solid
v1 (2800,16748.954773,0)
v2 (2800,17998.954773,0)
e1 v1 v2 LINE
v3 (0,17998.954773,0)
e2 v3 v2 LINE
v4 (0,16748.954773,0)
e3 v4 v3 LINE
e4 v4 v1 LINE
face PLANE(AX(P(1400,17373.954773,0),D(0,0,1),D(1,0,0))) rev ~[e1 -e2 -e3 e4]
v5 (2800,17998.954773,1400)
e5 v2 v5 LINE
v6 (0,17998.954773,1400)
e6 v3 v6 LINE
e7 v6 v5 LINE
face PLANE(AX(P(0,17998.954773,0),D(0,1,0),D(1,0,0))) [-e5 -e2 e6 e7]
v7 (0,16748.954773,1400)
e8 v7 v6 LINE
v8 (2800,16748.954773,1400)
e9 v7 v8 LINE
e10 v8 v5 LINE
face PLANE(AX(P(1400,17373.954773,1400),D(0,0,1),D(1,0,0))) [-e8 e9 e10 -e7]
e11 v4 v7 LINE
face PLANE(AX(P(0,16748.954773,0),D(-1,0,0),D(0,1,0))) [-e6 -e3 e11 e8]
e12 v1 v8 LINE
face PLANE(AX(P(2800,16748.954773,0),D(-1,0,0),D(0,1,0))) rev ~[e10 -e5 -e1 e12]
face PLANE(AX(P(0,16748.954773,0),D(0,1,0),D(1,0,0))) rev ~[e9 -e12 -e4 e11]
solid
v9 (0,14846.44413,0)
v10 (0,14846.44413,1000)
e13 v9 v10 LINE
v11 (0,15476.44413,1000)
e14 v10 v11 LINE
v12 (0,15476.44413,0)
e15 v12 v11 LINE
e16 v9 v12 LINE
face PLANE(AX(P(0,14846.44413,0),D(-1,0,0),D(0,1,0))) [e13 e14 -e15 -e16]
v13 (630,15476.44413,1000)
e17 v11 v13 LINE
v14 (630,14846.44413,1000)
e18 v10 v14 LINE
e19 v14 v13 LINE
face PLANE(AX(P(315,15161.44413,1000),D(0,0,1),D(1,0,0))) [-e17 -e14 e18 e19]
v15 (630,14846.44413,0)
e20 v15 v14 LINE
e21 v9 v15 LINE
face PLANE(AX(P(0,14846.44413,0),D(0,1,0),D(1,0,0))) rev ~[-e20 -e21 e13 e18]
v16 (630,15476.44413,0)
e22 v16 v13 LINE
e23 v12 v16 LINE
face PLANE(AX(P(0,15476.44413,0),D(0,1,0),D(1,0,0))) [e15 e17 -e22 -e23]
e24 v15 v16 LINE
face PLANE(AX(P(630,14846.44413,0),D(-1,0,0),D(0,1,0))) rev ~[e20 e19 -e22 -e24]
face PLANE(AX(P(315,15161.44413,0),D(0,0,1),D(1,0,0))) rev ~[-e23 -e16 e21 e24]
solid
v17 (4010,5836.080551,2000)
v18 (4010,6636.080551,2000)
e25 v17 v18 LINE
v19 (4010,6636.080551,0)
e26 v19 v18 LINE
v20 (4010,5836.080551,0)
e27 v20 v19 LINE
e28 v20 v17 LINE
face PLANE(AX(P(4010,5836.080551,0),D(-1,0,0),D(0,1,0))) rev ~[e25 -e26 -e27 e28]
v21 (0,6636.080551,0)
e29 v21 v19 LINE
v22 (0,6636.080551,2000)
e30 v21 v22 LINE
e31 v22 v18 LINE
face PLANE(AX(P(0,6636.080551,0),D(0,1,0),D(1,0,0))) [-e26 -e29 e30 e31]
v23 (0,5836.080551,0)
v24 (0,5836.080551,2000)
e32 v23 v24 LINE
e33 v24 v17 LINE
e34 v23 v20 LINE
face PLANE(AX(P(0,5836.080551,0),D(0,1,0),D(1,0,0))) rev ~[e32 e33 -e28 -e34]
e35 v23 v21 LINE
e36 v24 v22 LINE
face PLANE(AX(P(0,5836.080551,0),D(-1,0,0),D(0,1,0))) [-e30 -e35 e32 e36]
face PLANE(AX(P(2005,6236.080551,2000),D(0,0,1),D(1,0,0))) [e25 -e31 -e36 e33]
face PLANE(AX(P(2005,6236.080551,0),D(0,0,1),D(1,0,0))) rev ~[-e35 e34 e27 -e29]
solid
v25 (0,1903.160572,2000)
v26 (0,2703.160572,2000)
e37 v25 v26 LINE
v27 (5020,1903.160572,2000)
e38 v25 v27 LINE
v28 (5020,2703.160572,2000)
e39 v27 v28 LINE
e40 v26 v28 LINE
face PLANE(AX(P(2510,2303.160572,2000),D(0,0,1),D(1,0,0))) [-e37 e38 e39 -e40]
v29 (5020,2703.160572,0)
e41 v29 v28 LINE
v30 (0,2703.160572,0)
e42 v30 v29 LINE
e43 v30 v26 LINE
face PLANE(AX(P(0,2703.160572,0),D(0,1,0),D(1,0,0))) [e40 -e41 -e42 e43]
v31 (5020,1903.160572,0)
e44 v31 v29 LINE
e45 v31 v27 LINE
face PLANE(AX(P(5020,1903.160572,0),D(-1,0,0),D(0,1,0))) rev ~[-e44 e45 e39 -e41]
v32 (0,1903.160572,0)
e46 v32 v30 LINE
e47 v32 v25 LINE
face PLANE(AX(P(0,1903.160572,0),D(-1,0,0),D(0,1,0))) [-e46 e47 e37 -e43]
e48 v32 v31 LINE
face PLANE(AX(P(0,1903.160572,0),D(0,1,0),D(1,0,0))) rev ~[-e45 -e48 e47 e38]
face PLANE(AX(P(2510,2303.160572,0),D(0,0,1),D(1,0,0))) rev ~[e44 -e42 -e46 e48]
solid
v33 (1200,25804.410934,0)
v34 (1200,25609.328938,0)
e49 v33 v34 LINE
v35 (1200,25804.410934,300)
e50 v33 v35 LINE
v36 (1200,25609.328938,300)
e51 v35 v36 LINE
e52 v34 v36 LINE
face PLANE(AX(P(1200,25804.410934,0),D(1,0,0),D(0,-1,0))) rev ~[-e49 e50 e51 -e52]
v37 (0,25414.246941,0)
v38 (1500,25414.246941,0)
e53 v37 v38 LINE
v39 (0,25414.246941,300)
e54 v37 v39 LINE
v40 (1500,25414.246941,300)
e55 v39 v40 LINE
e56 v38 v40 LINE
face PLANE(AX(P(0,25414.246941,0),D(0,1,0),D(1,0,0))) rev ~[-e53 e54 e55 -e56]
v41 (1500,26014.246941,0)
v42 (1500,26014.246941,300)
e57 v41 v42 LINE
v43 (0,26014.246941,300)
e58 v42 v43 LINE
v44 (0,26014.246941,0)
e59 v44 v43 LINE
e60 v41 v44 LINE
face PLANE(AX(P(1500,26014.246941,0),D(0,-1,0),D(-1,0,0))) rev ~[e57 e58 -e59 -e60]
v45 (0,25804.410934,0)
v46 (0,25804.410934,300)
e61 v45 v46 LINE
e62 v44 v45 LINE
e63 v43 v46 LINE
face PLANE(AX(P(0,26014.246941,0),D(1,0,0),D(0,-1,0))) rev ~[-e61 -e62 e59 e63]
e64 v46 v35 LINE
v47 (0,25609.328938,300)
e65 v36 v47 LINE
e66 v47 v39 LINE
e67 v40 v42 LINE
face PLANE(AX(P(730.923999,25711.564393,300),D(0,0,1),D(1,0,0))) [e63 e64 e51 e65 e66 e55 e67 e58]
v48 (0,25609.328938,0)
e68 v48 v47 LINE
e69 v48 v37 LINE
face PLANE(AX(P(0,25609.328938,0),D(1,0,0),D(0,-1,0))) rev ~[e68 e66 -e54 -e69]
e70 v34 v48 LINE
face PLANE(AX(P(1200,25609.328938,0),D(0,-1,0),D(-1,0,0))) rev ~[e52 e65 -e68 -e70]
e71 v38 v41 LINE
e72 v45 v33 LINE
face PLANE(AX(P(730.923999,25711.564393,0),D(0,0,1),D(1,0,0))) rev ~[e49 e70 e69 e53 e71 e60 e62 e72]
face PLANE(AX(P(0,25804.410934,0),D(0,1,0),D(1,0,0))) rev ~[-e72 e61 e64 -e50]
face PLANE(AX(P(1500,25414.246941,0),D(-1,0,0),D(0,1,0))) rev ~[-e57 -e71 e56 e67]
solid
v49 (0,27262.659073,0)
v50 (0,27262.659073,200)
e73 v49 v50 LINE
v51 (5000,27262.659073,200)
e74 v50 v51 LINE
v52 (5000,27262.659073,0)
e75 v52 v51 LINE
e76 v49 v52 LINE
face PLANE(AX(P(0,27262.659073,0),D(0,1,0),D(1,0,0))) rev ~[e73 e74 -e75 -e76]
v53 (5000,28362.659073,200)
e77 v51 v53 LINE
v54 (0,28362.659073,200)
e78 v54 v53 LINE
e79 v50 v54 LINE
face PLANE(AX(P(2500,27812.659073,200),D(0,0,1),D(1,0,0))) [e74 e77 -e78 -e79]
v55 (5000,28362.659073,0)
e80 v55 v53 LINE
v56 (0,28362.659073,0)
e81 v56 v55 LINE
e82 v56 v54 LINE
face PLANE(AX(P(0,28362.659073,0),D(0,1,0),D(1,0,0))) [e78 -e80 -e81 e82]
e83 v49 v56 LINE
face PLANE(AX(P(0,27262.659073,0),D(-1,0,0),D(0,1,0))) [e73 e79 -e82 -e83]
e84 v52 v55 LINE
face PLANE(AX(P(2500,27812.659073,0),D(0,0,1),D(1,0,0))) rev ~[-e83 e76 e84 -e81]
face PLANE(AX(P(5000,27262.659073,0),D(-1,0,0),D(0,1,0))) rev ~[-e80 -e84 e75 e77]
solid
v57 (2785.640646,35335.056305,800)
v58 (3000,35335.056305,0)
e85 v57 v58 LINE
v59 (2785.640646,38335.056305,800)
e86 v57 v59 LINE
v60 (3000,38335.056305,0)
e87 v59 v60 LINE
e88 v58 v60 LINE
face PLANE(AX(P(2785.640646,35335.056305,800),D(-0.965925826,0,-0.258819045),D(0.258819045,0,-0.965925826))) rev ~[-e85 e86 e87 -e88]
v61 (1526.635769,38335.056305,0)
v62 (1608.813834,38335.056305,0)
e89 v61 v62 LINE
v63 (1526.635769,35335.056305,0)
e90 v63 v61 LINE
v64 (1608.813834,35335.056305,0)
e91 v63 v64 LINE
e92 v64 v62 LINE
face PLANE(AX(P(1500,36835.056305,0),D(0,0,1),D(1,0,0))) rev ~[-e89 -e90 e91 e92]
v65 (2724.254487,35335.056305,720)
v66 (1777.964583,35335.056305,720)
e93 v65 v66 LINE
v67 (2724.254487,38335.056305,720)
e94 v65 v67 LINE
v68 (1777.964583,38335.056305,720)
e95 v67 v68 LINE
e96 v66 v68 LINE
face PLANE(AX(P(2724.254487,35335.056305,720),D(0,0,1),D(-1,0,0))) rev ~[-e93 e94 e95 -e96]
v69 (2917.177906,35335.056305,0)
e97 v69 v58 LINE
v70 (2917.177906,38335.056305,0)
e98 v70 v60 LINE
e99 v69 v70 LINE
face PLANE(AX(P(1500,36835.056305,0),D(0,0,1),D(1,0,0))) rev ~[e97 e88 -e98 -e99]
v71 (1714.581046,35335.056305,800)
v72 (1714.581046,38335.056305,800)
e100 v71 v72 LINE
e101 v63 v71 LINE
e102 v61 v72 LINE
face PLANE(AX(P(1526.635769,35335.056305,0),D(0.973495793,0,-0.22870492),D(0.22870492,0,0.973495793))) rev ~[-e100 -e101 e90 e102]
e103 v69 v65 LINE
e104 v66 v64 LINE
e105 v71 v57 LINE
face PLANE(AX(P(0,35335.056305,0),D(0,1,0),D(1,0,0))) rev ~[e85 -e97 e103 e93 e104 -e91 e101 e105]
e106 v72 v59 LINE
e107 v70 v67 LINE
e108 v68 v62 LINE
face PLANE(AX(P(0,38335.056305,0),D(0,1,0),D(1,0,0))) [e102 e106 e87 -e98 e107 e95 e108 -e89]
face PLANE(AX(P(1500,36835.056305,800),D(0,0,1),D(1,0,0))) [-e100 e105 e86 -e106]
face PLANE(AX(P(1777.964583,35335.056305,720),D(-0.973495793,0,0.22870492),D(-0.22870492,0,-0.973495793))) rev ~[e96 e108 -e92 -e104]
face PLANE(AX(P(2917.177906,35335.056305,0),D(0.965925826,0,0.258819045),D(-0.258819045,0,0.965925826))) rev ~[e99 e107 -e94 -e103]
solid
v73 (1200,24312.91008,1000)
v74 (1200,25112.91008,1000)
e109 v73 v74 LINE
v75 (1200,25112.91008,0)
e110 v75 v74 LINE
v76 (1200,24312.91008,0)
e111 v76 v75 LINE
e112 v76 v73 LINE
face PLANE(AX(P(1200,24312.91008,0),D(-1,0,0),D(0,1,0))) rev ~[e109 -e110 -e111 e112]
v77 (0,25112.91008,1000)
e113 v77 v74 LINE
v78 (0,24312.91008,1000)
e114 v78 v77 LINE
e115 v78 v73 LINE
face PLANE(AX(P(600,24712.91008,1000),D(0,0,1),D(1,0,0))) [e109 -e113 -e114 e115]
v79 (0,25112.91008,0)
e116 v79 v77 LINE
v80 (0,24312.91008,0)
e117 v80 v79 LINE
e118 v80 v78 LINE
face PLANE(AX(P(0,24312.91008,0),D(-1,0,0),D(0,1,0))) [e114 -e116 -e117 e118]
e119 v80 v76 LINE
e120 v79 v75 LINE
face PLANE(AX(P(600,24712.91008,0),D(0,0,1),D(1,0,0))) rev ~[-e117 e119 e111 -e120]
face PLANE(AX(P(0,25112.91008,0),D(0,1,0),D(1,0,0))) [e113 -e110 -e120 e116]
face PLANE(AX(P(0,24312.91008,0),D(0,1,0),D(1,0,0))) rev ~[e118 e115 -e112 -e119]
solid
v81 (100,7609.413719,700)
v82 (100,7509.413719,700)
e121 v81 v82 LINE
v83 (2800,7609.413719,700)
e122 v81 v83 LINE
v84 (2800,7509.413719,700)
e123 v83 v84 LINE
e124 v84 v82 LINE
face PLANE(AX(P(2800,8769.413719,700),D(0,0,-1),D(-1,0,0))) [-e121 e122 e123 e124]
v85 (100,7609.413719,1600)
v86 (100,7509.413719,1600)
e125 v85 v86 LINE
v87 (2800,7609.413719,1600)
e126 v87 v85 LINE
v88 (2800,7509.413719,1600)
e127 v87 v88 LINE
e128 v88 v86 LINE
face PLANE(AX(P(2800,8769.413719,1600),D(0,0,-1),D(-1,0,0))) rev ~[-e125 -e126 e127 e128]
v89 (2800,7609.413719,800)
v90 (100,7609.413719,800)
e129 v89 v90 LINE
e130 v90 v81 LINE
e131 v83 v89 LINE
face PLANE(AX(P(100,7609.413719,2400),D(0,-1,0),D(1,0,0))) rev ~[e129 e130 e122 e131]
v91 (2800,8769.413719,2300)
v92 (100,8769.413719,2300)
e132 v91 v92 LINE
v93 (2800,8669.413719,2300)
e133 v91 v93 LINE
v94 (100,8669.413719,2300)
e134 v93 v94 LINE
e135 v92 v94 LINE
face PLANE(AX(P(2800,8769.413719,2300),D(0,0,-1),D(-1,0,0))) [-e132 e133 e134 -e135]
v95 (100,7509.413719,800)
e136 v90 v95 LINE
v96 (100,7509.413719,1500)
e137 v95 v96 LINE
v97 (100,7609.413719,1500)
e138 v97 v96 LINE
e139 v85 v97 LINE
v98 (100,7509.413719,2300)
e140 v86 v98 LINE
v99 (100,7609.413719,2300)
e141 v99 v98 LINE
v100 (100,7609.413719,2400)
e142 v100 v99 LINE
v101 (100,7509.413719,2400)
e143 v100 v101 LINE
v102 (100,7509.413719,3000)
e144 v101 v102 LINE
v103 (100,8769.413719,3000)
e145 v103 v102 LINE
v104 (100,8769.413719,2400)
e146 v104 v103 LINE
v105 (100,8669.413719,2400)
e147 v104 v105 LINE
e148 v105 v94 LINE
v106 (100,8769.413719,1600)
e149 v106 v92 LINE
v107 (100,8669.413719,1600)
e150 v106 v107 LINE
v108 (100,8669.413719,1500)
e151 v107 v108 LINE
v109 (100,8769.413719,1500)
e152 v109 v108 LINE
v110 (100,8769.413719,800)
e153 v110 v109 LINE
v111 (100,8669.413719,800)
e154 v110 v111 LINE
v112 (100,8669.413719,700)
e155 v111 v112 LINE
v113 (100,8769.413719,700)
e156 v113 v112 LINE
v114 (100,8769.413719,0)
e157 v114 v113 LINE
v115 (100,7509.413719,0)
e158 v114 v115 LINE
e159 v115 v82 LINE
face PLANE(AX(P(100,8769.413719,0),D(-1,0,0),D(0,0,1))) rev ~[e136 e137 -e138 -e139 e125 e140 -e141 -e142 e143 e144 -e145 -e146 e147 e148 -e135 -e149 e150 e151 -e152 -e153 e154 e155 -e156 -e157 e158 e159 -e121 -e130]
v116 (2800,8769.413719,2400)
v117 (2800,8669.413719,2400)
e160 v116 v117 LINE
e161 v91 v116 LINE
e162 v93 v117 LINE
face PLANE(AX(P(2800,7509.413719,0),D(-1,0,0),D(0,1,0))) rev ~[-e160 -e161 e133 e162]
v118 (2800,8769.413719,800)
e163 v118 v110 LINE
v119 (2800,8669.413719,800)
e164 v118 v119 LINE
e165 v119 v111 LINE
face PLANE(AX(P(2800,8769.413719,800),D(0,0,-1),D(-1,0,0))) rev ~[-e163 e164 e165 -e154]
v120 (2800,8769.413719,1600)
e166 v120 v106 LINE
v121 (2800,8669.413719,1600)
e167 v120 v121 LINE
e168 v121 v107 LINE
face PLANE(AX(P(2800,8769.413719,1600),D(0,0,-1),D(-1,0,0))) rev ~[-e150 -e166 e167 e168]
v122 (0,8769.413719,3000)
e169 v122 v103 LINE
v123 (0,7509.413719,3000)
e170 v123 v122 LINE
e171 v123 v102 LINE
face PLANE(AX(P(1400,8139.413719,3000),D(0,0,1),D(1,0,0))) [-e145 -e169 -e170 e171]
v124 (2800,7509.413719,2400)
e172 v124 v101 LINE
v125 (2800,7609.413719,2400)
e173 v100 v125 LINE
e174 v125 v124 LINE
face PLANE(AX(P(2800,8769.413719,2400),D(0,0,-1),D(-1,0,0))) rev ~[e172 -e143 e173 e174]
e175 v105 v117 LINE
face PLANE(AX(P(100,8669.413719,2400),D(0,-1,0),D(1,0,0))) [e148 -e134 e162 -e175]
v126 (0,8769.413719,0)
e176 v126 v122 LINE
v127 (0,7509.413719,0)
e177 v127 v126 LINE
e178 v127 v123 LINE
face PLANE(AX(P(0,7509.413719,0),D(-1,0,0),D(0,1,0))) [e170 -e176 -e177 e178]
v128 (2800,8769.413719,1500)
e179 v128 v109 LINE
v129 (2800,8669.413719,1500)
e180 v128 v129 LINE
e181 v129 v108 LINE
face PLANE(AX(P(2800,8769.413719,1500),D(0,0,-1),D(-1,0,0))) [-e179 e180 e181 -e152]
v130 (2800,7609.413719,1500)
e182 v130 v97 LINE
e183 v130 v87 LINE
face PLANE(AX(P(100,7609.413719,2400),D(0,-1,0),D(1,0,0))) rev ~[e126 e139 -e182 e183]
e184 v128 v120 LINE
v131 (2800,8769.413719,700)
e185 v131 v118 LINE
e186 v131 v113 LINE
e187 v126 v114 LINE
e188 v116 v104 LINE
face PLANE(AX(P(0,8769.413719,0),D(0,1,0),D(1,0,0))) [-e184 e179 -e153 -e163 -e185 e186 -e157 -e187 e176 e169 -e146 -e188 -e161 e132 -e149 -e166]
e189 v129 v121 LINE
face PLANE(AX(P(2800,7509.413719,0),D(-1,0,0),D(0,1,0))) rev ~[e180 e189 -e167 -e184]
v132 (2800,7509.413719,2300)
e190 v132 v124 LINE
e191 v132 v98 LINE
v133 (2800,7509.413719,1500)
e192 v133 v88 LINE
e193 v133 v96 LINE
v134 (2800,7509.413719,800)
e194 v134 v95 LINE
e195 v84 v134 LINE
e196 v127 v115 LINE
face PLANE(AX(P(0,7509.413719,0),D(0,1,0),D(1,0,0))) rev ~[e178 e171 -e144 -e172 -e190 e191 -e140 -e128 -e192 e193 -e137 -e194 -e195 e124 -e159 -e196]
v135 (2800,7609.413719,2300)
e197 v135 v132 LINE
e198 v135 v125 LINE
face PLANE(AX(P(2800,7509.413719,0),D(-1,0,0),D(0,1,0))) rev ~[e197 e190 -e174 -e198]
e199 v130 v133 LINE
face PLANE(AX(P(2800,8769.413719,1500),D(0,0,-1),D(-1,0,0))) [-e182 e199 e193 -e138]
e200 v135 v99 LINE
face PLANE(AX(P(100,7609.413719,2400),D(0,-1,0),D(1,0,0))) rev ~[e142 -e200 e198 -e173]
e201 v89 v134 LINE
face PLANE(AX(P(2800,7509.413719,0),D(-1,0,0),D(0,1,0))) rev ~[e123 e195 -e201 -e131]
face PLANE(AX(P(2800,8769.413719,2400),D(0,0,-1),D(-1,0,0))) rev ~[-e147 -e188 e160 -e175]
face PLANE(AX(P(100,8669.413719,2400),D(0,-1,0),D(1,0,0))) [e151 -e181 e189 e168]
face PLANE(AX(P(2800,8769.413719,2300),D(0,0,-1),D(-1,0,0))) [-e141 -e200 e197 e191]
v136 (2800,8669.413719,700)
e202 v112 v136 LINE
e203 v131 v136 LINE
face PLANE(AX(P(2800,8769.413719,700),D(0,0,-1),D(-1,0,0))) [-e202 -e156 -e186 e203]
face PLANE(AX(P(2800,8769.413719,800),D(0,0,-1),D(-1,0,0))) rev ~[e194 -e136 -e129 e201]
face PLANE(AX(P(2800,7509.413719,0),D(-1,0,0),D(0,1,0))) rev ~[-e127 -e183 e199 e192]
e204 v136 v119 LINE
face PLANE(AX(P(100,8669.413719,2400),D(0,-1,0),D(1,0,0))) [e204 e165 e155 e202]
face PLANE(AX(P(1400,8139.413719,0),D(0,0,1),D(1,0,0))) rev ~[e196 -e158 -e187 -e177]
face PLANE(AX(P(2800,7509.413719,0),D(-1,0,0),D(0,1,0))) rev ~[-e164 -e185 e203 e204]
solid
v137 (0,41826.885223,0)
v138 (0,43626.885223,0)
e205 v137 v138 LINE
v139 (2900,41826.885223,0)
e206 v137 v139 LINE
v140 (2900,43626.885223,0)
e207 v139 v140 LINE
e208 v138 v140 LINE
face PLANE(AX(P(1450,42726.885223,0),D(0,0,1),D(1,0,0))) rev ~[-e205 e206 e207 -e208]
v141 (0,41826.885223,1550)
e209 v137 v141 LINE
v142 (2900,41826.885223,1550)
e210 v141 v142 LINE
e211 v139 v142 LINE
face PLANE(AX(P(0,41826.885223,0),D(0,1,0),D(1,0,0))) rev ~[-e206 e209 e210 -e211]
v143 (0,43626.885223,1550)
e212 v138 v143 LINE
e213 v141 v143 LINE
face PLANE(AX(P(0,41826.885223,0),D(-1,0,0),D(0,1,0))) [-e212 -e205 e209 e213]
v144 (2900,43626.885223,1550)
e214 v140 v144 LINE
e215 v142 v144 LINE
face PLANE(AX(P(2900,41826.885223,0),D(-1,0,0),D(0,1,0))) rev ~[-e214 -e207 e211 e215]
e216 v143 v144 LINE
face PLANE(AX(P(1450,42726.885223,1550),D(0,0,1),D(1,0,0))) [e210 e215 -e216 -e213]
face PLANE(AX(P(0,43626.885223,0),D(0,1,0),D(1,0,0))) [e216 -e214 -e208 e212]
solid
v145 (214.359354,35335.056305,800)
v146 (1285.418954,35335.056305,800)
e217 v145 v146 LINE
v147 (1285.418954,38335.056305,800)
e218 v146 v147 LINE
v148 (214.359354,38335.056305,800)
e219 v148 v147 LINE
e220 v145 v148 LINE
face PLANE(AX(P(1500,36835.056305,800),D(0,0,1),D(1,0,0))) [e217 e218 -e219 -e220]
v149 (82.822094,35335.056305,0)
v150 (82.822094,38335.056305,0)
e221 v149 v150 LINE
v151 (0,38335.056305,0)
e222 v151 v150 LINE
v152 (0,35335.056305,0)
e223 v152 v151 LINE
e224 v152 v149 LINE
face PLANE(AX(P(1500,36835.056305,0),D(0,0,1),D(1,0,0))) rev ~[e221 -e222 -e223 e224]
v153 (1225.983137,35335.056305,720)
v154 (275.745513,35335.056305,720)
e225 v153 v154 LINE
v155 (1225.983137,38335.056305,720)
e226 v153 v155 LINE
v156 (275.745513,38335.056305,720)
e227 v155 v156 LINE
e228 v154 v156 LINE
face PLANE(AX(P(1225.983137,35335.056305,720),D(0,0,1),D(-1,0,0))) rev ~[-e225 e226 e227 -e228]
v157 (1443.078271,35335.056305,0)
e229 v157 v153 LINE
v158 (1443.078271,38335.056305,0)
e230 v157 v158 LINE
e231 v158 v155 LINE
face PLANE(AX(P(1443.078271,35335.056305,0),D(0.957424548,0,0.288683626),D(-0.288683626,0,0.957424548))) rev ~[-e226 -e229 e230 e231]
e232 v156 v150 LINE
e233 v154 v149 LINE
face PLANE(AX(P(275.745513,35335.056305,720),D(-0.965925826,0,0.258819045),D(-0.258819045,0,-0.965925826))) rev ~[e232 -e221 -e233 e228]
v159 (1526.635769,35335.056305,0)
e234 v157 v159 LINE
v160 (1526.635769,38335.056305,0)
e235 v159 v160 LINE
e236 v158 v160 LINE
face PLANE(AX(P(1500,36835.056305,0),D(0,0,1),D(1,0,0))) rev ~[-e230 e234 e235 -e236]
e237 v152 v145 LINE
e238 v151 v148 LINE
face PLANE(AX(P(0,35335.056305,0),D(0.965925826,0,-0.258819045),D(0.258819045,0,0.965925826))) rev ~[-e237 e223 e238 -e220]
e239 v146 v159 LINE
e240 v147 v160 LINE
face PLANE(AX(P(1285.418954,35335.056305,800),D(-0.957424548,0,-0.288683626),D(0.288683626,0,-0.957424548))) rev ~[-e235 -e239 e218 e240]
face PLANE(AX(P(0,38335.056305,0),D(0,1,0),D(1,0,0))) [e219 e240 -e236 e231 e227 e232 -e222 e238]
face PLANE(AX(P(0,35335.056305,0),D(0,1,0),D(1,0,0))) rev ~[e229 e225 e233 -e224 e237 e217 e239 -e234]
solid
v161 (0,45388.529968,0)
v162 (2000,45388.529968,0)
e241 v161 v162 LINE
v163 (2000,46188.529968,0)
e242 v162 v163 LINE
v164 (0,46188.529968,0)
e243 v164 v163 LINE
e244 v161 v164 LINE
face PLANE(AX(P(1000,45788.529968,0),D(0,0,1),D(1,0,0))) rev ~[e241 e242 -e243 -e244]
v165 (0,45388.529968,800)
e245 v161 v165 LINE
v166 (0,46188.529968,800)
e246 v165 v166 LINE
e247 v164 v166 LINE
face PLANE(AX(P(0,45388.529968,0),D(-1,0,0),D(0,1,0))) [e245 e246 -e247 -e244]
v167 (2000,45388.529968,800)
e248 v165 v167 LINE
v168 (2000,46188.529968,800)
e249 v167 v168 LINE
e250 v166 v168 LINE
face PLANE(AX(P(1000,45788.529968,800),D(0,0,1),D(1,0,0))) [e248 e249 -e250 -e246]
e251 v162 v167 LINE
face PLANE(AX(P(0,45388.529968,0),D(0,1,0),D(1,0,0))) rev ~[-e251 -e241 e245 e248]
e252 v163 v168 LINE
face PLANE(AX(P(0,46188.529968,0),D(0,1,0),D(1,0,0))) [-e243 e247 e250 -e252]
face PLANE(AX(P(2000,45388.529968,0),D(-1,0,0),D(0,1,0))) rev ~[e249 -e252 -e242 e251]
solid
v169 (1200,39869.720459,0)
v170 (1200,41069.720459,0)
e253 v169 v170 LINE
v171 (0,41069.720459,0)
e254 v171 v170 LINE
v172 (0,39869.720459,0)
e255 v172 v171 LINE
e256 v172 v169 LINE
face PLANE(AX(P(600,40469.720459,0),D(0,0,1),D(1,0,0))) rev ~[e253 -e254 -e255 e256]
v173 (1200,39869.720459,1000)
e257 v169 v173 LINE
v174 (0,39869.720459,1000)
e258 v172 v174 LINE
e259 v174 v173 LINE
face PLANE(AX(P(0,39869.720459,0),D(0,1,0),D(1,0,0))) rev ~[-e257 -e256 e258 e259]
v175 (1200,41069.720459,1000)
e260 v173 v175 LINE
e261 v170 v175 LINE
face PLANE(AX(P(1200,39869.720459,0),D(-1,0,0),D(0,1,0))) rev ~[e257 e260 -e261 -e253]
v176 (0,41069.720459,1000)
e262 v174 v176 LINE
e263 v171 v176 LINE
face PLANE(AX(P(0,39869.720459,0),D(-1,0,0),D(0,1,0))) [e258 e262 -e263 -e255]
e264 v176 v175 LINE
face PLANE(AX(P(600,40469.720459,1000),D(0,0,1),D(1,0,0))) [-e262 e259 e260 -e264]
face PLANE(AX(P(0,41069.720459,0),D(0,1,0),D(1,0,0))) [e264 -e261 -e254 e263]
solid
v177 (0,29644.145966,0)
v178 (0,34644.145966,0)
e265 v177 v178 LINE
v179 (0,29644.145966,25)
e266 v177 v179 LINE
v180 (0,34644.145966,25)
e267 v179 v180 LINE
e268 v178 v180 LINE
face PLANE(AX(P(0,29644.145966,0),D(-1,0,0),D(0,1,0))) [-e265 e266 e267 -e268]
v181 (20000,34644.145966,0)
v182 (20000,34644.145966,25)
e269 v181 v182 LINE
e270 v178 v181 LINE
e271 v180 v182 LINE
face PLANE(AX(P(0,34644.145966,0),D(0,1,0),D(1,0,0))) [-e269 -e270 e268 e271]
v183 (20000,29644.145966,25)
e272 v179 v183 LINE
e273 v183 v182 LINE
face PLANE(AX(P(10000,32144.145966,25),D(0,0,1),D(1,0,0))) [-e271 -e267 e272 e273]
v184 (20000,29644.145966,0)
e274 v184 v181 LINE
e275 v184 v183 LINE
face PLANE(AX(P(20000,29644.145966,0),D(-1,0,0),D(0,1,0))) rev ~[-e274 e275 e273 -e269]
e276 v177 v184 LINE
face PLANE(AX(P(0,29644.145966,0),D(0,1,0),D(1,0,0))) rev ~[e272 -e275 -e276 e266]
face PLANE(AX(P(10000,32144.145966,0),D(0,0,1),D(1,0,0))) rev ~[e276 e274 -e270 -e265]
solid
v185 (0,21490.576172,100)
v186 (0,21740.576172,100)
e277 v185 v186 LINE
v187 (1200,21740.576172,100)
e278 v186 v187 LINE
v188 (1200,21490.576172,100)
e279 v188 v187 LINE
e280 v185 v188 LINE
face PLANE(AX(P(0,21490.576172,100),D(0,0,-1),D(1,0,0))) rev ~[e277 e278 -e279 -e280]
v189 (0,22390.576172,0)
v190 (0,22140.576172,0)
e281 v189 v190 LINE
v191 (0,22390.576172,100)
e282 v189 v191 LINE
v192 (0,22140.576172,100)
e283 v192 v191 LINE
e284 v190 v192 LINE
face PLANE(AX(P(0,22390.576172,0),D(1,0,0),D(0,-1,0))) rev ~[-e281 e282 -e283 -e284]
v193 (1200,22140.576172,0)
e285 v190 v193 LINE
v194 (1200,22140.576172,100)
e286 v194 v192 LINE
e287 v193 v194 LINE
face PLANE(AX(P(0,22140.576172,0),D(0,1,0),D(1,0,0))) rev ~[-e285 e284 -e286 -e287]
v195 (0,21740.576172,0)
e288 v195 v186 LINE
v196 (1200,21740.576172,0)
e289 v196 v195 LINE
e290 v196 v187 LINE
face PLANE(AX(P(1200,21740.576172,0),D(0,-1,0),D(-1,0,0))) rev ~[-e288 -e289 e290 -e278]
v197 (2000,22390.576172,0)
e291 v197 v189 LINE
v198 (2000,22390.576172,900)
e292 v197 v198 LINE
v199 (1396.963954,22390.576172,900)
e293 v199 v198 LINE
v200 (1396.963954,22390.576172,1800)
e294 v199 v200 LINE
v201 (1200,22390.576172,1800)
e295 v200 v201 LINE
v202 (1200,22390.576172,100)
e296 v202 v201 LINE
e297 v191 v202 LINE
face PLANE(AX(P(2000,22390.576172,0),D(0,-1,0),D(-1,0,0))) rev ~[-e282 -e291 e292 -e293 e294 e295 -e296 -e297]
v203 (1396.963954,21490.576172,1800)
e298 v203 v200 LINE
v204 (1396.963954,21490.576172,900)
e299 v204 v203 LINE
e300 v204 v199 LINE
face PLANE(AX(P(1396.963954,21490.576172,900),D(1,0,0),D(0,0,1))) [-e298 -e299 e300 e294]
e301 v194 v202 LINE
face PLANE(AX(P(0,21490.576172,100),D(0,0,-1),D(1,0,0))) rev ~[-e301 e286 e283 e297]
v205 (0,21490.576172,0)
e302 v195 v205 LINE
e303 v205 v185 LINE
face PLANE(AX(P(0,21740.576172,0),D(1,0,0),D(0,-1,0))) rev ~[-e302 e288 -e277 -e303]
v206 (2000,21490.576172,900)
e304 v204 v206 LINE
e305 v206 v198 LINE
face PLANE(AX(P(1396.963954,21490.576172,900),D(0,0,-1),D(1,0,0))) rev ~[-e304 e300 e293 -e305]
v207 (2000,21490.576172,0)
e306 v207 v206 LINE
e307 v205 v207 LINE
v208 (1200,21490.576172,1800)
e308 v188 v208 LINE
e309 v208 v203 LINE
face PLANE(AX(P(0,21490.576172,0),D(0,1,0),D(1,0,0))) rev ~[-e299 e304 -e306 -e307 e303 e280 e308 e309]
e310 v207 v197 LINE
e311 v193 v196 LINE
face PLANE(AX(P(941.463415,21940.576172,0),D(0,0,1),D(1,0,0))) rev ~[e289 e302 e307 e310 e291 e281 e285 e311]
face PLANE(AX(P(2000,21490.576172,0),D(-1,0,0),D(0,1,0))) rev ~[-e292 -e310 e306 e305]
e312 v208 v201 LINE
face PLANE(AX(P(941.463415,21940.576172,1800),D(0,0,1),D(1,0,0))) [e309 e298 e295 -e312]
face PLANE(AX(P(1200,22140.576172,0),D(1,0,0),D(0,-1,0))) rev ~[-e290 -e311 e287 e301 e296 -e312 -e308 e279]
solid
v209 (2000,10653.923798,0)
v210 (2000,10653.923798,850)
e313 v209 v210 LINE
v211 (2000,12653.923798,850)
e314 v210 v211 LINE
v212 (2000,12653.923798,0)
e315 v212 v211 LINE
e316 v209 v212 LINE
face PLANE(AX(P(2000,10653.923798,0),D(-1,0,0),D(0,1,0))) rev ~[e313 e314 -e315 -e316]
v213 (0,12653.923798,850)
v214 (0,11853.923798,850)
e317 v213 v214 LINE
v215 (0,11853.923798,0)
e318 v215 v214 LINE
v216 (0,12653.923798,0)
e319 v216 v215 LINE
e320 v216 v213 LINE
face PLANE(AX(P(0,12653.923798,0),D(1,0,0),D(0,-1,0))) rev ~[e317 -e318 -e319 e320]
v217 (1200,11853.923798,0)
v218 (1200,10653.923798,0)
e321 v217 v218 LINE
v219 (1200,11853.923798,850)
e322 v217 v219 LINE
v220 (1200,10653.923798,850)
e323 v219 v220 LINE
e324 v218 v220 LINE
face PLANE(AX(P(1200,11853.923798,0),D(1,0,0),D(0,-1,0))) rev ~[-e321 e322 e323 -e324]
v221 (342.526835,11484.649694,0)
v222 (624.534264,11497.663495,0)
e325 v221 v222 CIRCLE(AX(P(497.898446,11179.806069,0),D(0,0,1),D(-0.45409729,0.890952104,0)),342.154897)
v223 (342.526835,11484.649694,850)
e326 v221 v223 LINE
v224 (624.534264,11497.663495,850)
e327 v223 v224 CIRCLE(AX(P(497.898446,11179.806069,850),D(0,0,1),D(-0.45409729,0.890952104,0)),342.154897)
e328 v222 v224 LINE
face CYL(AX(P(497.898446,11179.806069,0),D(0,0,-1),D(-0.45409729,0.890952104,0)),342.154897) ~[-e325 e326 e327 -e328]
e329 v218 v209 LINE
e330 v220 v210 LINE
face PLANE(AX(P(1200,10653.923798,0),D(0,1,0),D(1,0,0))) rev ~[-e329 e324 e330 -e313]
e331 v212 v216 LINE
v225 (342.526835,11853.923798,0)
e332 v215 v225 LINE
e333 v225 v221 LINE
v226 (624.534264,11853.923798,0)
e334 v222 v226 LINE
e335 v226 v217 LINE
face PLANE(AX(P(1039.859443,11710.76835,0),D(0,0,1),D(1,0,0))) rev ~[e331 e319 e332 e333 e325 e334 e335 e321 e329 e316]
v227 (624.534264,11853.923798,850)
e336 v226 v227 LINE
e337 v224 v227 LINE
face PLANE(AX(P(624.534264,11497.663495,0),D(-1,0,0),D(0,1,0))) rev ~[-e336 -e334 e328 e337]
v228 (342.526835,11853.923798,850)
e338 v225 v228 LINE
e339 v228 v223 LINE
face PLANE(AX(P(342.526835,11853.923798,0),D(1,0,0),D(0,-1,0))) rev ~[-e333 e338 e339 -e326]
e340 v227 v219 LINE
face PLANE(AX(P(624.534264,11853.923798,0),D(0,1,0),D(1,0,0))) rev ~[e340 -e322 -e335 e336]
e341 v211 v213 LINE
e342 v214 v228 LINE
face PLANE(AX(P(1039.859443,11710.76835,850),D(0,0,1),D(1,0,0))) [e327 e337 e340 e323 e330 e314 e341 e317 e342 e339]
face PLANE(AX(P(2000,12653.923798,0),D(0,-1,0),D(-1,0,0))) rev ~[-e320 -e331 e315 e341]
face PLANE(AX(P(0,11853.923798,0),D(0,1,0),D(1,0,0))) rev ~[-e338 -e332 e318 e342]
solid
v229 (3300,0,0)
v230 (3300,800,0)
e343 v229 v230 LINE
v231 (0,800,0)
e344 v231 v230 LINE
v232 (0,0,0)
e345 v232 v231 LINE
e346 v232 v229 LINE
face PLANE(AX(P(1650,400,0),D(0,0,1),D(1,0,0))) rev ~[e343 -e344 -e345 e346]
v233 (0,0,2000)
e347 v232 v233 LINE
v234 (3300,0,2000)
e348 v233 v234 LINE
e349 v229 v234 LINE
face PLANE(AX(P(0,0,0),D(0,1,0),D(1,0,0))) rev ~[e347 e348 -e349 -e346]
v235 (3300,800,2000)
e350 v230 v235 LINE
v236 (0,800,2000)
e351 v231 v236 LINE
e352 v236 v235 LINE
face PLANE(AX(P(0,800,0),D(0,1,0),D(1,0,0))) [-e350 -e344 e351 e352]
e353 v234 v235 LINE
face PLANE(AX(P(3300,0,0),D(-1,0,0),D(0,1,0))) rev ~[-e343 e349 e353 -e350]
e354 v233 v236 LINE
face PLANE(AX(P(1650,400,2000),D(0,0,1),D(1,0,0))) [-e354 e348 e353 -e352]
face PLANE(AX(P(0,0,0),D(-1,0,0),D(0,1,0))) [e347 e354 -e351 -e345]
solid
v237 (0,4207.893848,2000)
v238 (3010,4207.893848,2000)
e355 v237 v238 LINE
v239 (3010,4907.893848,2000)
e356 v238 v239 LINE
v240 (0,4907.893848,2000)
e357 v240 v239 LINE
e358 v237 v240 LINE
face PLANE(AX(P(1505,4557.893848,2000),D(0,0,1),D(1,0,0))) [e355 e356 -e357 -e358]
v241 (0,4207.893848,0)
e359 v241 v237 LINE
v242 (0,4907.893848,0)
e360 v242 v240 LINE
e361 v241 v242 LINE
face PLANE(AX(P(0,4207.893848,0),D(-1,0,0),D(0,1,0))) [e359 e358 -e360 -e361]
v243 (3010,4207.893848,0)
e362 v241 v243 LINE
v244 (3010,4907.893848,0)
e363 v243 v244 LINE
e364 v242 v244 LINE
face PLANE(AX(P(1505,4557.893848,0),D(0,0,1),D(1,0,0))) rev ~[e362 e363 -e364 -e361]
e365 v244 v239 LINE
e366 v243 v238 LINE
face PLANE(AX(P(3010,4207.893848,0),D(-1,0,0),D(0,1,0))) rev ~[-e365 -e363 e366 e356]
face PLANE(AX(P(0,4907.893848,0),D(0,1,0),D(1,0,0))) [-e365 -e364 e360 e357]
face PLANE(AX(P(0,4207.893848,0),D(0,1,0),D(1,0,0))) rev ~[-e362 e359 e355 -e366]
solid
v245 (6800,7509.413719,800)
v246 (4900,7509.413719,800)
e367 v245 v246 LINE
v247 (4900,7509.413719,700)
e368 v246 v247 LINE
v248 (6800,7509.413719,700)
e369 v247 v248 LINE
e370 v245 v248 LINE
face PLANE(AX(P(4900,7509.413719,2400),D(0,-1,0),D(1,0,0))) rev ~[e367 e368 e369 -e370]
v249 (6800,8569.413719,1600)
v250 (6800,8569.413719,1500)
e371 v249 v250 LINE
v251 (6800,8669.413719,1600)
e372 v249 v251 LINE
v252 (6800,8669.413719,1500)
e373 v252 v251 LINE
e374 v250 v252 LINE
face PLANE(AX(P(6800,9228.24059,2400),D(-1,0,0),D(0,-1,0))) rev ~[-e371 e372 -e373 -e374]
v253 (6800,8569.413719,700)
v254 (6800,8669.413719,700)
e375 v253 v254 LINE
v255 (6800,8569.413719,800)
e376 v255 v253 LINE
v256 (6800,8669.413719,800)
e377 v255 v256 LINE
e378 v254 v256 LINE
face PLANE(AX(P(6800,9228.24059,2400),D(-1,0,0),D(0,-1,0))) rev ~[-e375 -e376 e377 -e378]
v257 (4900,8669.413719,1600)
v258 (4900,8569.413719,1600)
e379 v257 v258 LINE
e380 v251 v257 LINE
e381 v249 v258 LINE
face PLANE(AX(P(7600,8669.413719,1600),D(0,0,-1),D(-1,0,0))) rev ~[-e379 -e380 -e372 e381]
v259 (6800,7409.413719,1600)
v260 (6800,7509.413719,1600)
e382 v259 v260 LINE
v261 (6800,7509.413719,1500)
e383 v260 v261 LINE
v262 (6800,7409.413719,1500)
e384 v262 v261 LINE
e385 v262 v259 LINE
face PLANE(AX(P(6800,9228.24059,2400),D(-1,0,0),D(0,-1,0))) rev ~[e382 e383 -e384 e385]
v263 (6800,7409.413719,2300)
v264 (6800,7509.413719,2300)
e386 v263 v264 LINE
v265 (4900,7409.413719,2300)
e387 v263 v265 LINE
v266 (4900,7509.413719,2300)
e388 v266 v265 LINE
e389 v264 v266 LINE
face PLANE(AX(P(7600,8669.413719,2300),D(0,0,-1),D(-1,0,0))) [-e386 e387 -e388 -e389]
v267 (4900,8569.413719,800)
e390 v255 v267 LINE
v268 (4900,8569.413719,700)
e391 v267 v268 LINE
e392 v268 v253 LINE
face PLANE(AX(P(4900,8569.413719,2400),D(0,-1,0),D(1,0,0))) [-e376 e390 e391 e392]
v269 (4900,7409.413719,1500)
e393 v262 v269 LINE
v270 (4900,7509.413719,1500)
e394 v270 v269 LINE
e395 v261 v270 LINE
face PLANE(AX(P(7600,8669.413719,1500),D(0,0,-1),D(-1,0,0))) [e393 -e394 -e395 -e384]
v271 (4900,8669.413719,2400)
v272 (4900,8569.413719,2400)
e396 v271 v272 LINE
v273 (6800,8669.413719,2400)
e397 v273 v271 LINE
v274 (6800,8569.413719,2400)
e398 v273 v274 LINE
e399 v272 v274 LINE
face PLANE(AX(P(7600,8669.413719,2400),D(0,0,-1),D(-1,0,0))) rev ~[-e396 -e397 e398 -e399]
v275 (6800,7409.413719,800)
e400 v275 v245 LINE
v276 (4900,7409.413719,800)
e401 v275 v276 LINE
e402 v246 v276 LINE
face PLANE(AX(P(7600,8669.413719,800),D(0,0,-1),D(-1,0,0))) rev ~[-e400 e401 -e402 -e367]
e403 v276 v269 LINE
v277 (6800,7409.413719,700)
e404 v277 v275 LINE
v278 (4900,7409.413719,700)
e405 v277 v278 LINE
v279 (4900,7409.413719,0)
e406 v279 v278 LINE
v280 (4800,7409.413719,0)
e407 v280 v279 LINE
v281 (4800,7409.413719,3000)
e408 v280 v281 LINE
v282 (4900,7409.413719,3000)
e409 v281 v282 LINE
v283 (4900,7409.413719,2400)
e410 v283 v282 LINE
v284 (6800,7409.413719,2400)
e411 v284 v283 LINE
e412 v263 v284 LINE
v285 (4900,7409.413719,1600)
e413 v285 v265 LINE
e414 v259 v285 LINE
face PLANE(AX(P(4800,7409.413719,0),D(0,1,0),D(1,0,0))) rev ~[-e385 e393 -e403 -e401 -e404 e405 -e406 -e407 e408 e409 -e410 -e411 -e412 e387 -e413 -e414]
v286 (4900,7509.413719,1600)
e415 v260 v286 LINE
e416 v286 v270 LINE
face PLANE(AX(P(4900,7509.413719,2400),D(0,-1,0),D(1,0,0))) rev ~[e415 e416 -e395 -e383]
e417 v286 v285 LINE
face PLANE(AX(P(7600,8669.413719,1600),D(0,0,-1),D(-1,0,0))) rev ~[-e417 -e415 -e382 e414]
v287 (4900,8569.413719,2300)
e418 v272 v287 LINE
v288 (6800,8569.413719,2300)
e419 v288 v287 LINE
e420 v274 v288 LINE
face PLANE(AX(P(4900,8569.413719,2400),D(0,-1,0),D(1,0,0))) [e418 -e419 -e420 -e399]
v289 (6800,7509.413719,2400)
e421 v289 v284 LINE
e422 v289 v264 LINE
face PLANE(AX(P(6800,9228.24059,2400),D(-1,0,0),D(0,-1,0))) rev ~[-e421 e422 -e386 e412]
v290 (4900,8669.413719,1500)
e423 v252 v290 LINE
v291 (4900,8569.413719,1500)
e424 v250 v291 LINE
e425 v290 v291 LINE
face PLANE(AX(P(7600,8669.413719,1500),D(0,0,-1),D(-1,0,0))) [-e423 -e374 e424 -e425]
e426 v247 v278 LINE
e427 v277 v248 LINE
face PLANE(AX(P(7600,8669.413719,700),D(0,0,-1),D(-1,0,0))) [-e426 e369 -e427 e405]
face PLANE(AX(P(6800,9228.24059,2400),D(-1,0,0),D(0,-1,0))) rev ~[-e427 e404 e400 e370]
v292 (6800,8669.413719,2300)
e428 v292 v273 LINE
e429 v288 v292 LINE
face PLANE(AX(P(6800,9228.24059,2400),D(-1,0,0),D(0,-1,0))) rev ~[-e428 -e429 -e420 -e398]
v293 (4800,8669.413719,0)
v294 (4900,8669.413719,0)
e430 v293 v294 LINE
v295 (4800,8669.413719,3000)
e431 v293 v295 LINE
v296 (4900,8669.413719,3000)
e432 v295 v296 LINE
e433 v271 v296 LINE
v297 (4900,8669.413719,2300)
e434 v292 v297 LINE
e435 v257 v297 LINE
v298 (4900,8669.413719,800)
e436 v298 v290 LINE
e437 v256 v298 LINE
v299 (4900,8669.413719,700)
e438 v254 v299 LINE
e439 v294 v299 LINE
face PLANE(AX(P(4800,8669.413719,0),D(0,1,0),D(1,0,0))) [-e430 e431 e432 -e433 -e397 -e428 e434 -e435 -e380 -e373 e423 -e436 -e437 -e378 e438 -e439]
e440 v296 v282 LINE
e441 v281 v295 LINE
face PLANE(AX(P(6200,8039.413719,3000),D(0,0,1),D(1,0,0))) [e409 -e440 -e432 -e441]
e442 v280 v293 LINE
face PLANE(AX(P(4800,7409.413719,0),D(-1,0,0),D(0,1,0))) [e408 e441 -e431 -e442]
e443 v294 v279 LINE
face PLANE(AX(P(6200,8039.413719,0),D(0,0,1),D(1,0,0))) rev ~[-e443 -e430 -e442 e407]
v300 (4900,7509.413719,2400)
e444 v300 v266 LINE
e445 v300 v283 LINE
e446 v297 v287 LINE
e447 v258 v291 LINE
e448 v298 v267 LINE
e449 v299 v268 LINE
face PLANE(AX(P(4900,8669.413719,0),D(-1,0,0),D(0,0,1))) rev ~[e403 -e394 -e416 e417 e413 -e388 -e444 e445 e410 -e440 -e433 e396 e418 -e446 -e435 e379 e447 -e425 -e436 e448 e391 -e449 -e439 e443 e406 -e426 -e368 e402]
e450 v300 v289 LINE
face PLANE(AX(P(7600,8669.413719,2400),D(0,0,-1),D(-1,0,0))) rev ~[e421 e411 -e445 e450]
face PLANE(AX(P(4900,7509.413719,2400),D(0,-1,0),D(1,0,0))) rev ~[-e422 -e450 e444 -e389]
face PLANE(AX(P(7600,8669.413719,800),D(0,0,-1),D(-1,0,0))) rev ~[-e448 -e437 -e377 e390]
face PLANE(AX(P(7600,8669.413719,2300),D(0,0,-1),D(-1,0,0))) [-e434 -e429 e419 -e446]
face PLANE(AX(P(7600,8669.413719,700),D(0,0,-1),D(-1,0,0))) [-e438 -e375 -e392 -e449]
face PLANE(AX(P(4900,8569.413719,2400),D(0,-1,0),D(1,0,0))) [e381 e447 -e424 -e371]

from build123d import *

# Parameters (mm, degrees)
F0_W      = 3300
F0_H      = 800
F1_DEPTH  = 2000
F0_W_2    = 5020
F2_DEPTH  = 2000
F0_W_3    = 3010
F0_H_2    = 700
F3_DEPTH  = 2000
F0_W_4    = 4010
F4_DEPTH  = 2000
F0_W_5    = 2800
F0_H_3    = 1260
F5_DEPTH  = 3000
F6_W      = 2700
F6_H      = 700
F7_DEPTH  = 1260
F8_W      = 2988.0481862915
F8_H      = 1060
F9_DEPTH  = 1700
F10_DEPTH = 850
F0_W_6    = 630
F0_H_4    = 630
F11_DEPTH = 1000
F0_H_5    = 1250
F12_DEPTH = 1400
F13_DEPTH = 1800
F14_W     = 1200
F14_H     = 1700
F14_W_2   = 603.0360460281
F14_H_2   = 900
F15_DEPTH = 900
F16_DEPTH = 300
F0_W_7    = 1200
F17_DEPTH = 1000
F0_W_8    = 5000
F0_H_6    = 1100
F18_DEPTH = 200
F0_W_9    = 20000
F0_H_7    = 5000
F19_DEPTH = 25
F0_W_10   = 3000
F0_H_8    = 3000
F20_DEPTH = 800
F22_DEPTH = 3000
F0_H_9    = 1200
F23_DEPTH = 1000
F25_W     = 800
F25_H     = 100
F26_DEPTH = 2700
F27_W     = 2900
F27_H     = 1800
F28_DEPTH = 1550
F0_W_11   = 2000
F29_DEPTH = 800


# Not quite as in the source:
# - a feature names something its author has since deleted; it is built from what else it names


with BuildPart() as f1:
    # F0 (on Top) → F1 (new body)
    with BuildSketch(Plane.XY):
        with Locations((1650, 400)):
            Rectangle(F0_W, F0_H)
    extrude(amount=F1_DEPTH)


with BuildPart() as f2:
    # F0 (on Top) → F2 (new body)
    with BuildSketch(Plane.XY):
        with Locations((2510, 2303.160572052)):
            Rectangle(F0_W_2, F0_H)
    extrude(amount=F2_DEPTH)


with BuildPart() as f3:
    # F0 (on Top) → F3 (new body)
    with BuildSketch(Plane.XY):
        with Locations((1505, 4557.8938484192)):
            Rectangle(F0_W_3, F0_H_2)
    extrude(amount=F3_DEPTH)


with BuildPart() as f4:
    # F0 (on Top) → F4 (new body)
    with BuildSketch(Plane.XY):
        with Locations((2005, 6236.0805511475)):
            Rectangle(F0_W_4, F0_H)
    extrude(amount=F4_DEPTH)


with BuildPart() as f5:
    # F0 (on Top) → F5 (new body)
    with BuildSketch(Plane.XY):
        with Locations((1400, 8139.4137191772)):
            Rectangle(F0_W_5, F0_H_3)
    extrude(amount=F5_DEPTH)

    # F6 (on face) → F7 (cut, through all)
    with BuildSketch(Plane(origin=(0, 8769.4137191772, 0), x_dir=(-1, 0, 0), z_dir=(0, 1, 0))):
        with Locations((-1450, 350)):
            Rectangle(F6_W, F6_H)
        with Locations((-1450, 1150)):
            Rectangle(F6_W, F6_H)
        with Locations((-1450, 1950)):
            Rectangle(F6_W, F6_H)
        with Locations((-1450, 2750)):
            Rectangle(F6_W, F6_H)
    extrude(amount=-F7_DEPTH, mode=Mode.SUBTRACT)

    # F8 (on face) → F9 (cut, through all)
    with BuildSketch(Plane.XY.offset(2400)):
        with Locations((1594.0240931458, 8139.4137191772)):
            Rectangle(F8_W, F8_H)
    extrude(amount=-F9_DEPTH, mode=Mode.SUBTRACT)


with BuildPart() as f10:
    # F0 (on Top) → F10 (new body)
    with BuildSketch(Plane.XY):
        with BuildLine():
            Line((0, 12653.9237976074), (0, 11853.9237976074))
            Line((0, 11853.9237976074), (342.5268346084, 11853.9237976074))
            Line((342.5268346084, 11853.9237976074), (342.5268346084, 11484.6496938236))
            ThreePointArc((342.5268346084, 11484.6496938236), (513.6710875982, 10838.0149080306), (624.5342638872, 11497.6634945311))
            Line((624.5342638872, 11497.6634945311), (624.5342638872, 11853.9237976074))
            Line((624.5342638872, 11853.9237976074), (1200, 11853.9237976074))
            Line((1200, 11853.9237976074), (1200, 10653.9237976074))
            Line((1200, 10653.9237976074), (2000, 10653.9237976074))
            Line((2000, 10653.9237976074), (2000, 12653.9237976074))
            Line((2000, 12653.9237976074), (0, 12653.9237976074))
        make_face()
    extrude(amount=F10_DEPTH)


with BuildPart() as f11:
    # F0 (on Top) → F11 (new body)
    with BuildSketch(Plane.XY):
        with Locations((315, 15161.4441299438)):
            Rectangle(F0_W_6, F0_H_4)
    extrude(amount=F11_DEPTH)


with BuildPart() as f12:
    # F0 (on Top) → F12 (new body)
    with BuildSketch(Plane.XY):
        with Locations((1400, 17373.9547729492)):
            Rectangle(F0_W_5, F0_H_5)
    extrude(amount=F12_DEPTH)


with BuildPart() as f13:
    # F0 (on Top) → F13 (new body)
    with BuildSketch(Plane.XY):
        Polygon((0, 21740.576171875), (0, 21490.576171875), (2000, 21490.576171875), (2000, 22390.576171875), (0, 22390.576171875), (0, 22140.576171875), (1200, 22140.576171875), (1200, 21740.576171875), align=None)
    extrude(amount=F13_DEPTH)

    # F14 (on face) → F15 (cut, through all)
    with BuildSketch(Plane.XZ.offset(-21490.576171875)):
        with Locations((600, 950)):
            Rectangle(F14_W, F14_H)
        with Locations((1698.4819769859, 1350)):
            Rectangle(F14_W_2, F14_H_2)
    extrude(amount=-F15_DEPTH, mode=Mode.SUBTRACT)


with BuildPart() as f16:
    # F0 (on Top) → F16 (new body)
    with BuildSketch(Plane.XY):
        Polygon((0, 25609.3289375305), (0, 25414.2469406128), (1500, 25414.2469406128), (1500, 26014.2469406128), (0, 26014.2469406128), (0, 25804.4109344482), (1200, 25804.4109344482), (1200, 25609.3289375305), align=None)
    extrude(amount=F16_DEPTH)


with BuildPart() as f17:
    # F0 (on Top) → F17 (new body)
    with BuildSketch(Plane.XY):
        with Locations((600, 24712.9100799561)):
            Rectangle(F0_W_7, F0_H)
    extrude(amount=F17_DEPTH)


with BuildPart() as f18:
    # F0 (on Top) → F18 (new body)
    with BuildSketch(Plane.XY):
        with Locations((2500, 27812.659072876)):
            Rectangle(F0_W_8, F0_H_6)
    extrude(amount=F18_DEPTH)


with BuildPart() as f19:
    # F0 (on Top) → F19 (new body)
    with BuildSketch(Plane.XY):
        with Locations((10000, 32144.1459655762)):
            Rectangle(F0_W_9, F0_H_7)
    extrude(amount=F19_DEPTH)


with BuildPart() as f20:
    # F0 (on Top) → F20 (new body)
    with BuildSketch(Plane.XY):
        with Locations((1500, 36835.0563049316)):
            Rectangle(F0_W_10, F0_H_8)
    extrude(amount=F20_DEPTH)

    # F21 (on face) → F22 (cut, through all)
    with BuildSketch(Plane.XZ.offset(-35335.0563049316)):
        Polygon((0, 800), (0, 0), (214.3593539449, 800), align=None)
        Polygon((1714.5810461517, 800), (1285.4189538483, 800), (1526.6357693569, 0), align=None)
        Polygon((3000, 800), (2785.6406460551, 800), (3000, 0), align=None)
        Polygon((275.7455129832, 720), (82.8220944328, 0), (1443.0782710648, 0), (1225.983137107, 720), align=None)
        Polygon((1777.9645828854, 720), (1608.8138337701, 0), (2917.1779055672, 0), (2724.2544870168, 720), align=None)
    extrude(amount=-F22_DEPTH, mode=Mode.SUBTRACT)


with BuildPart() as f23:
    # F0 (on Top) → F23 (new body)
    with BuildSketch(Plane.XY):
        with Locations((600, 40469.7204589844)):
            Rectangle(F0_W_7, F0_H_9)
    extrude(amount=F23_DEPTH)


with BuildPart() as f24_1:
    # F24: copy of F5
    add(f5.part.moved(Location((4800, -100, 0))))

    # F25 (on face) → F26 (cut)
    with BuildSketch(Plane.XY.offset(2400)):
        Polygon((9301.088013608, 9228.2405896963), (6800, 9228.2405896963), (6800, 7509.4137191772), (7600, 7509.4137191772), (7600, 7409.4137191772), (6800, 7409.4137191772), (6800, 6951.2433008371), (9301.088013608, 6951.2433008371), align=None)
        with Locations((7200, 7459.4137191772)):
            Rectangle(F25_W, F25_H)
    extrude(amount=-F26_DEPTH, mode=Mode.SUBTRACT)


with BuildPart() as f28:
    # F27 (on Top) → F28 (new body)
    with BuildSketch(Plane.XY):
        with Locations((1450, 42726.8852233887)):
            Rectangle(F27_W, F27_H)
    extrude(amount=F28_DEPTH)


with BuildPart() as f29:
    # F0 (on Top) → F29 (new body)
    with BuildSketch(Plane.XY):
        with Locations((1000, 45788.5299682617)):
            Rectangle(F0_W_11, F0_H)
    extrude(amount=F29_DEPTH)


solid = Compound([f1.part, f2.part, f3.part, f4.part, f5.part, f10.part, f11.part, f12.part, f13.part, f16.part, f17.part, f18.part, f19.part, f20.part, f23.part, f24_1.part, f28.part, f29.part])
